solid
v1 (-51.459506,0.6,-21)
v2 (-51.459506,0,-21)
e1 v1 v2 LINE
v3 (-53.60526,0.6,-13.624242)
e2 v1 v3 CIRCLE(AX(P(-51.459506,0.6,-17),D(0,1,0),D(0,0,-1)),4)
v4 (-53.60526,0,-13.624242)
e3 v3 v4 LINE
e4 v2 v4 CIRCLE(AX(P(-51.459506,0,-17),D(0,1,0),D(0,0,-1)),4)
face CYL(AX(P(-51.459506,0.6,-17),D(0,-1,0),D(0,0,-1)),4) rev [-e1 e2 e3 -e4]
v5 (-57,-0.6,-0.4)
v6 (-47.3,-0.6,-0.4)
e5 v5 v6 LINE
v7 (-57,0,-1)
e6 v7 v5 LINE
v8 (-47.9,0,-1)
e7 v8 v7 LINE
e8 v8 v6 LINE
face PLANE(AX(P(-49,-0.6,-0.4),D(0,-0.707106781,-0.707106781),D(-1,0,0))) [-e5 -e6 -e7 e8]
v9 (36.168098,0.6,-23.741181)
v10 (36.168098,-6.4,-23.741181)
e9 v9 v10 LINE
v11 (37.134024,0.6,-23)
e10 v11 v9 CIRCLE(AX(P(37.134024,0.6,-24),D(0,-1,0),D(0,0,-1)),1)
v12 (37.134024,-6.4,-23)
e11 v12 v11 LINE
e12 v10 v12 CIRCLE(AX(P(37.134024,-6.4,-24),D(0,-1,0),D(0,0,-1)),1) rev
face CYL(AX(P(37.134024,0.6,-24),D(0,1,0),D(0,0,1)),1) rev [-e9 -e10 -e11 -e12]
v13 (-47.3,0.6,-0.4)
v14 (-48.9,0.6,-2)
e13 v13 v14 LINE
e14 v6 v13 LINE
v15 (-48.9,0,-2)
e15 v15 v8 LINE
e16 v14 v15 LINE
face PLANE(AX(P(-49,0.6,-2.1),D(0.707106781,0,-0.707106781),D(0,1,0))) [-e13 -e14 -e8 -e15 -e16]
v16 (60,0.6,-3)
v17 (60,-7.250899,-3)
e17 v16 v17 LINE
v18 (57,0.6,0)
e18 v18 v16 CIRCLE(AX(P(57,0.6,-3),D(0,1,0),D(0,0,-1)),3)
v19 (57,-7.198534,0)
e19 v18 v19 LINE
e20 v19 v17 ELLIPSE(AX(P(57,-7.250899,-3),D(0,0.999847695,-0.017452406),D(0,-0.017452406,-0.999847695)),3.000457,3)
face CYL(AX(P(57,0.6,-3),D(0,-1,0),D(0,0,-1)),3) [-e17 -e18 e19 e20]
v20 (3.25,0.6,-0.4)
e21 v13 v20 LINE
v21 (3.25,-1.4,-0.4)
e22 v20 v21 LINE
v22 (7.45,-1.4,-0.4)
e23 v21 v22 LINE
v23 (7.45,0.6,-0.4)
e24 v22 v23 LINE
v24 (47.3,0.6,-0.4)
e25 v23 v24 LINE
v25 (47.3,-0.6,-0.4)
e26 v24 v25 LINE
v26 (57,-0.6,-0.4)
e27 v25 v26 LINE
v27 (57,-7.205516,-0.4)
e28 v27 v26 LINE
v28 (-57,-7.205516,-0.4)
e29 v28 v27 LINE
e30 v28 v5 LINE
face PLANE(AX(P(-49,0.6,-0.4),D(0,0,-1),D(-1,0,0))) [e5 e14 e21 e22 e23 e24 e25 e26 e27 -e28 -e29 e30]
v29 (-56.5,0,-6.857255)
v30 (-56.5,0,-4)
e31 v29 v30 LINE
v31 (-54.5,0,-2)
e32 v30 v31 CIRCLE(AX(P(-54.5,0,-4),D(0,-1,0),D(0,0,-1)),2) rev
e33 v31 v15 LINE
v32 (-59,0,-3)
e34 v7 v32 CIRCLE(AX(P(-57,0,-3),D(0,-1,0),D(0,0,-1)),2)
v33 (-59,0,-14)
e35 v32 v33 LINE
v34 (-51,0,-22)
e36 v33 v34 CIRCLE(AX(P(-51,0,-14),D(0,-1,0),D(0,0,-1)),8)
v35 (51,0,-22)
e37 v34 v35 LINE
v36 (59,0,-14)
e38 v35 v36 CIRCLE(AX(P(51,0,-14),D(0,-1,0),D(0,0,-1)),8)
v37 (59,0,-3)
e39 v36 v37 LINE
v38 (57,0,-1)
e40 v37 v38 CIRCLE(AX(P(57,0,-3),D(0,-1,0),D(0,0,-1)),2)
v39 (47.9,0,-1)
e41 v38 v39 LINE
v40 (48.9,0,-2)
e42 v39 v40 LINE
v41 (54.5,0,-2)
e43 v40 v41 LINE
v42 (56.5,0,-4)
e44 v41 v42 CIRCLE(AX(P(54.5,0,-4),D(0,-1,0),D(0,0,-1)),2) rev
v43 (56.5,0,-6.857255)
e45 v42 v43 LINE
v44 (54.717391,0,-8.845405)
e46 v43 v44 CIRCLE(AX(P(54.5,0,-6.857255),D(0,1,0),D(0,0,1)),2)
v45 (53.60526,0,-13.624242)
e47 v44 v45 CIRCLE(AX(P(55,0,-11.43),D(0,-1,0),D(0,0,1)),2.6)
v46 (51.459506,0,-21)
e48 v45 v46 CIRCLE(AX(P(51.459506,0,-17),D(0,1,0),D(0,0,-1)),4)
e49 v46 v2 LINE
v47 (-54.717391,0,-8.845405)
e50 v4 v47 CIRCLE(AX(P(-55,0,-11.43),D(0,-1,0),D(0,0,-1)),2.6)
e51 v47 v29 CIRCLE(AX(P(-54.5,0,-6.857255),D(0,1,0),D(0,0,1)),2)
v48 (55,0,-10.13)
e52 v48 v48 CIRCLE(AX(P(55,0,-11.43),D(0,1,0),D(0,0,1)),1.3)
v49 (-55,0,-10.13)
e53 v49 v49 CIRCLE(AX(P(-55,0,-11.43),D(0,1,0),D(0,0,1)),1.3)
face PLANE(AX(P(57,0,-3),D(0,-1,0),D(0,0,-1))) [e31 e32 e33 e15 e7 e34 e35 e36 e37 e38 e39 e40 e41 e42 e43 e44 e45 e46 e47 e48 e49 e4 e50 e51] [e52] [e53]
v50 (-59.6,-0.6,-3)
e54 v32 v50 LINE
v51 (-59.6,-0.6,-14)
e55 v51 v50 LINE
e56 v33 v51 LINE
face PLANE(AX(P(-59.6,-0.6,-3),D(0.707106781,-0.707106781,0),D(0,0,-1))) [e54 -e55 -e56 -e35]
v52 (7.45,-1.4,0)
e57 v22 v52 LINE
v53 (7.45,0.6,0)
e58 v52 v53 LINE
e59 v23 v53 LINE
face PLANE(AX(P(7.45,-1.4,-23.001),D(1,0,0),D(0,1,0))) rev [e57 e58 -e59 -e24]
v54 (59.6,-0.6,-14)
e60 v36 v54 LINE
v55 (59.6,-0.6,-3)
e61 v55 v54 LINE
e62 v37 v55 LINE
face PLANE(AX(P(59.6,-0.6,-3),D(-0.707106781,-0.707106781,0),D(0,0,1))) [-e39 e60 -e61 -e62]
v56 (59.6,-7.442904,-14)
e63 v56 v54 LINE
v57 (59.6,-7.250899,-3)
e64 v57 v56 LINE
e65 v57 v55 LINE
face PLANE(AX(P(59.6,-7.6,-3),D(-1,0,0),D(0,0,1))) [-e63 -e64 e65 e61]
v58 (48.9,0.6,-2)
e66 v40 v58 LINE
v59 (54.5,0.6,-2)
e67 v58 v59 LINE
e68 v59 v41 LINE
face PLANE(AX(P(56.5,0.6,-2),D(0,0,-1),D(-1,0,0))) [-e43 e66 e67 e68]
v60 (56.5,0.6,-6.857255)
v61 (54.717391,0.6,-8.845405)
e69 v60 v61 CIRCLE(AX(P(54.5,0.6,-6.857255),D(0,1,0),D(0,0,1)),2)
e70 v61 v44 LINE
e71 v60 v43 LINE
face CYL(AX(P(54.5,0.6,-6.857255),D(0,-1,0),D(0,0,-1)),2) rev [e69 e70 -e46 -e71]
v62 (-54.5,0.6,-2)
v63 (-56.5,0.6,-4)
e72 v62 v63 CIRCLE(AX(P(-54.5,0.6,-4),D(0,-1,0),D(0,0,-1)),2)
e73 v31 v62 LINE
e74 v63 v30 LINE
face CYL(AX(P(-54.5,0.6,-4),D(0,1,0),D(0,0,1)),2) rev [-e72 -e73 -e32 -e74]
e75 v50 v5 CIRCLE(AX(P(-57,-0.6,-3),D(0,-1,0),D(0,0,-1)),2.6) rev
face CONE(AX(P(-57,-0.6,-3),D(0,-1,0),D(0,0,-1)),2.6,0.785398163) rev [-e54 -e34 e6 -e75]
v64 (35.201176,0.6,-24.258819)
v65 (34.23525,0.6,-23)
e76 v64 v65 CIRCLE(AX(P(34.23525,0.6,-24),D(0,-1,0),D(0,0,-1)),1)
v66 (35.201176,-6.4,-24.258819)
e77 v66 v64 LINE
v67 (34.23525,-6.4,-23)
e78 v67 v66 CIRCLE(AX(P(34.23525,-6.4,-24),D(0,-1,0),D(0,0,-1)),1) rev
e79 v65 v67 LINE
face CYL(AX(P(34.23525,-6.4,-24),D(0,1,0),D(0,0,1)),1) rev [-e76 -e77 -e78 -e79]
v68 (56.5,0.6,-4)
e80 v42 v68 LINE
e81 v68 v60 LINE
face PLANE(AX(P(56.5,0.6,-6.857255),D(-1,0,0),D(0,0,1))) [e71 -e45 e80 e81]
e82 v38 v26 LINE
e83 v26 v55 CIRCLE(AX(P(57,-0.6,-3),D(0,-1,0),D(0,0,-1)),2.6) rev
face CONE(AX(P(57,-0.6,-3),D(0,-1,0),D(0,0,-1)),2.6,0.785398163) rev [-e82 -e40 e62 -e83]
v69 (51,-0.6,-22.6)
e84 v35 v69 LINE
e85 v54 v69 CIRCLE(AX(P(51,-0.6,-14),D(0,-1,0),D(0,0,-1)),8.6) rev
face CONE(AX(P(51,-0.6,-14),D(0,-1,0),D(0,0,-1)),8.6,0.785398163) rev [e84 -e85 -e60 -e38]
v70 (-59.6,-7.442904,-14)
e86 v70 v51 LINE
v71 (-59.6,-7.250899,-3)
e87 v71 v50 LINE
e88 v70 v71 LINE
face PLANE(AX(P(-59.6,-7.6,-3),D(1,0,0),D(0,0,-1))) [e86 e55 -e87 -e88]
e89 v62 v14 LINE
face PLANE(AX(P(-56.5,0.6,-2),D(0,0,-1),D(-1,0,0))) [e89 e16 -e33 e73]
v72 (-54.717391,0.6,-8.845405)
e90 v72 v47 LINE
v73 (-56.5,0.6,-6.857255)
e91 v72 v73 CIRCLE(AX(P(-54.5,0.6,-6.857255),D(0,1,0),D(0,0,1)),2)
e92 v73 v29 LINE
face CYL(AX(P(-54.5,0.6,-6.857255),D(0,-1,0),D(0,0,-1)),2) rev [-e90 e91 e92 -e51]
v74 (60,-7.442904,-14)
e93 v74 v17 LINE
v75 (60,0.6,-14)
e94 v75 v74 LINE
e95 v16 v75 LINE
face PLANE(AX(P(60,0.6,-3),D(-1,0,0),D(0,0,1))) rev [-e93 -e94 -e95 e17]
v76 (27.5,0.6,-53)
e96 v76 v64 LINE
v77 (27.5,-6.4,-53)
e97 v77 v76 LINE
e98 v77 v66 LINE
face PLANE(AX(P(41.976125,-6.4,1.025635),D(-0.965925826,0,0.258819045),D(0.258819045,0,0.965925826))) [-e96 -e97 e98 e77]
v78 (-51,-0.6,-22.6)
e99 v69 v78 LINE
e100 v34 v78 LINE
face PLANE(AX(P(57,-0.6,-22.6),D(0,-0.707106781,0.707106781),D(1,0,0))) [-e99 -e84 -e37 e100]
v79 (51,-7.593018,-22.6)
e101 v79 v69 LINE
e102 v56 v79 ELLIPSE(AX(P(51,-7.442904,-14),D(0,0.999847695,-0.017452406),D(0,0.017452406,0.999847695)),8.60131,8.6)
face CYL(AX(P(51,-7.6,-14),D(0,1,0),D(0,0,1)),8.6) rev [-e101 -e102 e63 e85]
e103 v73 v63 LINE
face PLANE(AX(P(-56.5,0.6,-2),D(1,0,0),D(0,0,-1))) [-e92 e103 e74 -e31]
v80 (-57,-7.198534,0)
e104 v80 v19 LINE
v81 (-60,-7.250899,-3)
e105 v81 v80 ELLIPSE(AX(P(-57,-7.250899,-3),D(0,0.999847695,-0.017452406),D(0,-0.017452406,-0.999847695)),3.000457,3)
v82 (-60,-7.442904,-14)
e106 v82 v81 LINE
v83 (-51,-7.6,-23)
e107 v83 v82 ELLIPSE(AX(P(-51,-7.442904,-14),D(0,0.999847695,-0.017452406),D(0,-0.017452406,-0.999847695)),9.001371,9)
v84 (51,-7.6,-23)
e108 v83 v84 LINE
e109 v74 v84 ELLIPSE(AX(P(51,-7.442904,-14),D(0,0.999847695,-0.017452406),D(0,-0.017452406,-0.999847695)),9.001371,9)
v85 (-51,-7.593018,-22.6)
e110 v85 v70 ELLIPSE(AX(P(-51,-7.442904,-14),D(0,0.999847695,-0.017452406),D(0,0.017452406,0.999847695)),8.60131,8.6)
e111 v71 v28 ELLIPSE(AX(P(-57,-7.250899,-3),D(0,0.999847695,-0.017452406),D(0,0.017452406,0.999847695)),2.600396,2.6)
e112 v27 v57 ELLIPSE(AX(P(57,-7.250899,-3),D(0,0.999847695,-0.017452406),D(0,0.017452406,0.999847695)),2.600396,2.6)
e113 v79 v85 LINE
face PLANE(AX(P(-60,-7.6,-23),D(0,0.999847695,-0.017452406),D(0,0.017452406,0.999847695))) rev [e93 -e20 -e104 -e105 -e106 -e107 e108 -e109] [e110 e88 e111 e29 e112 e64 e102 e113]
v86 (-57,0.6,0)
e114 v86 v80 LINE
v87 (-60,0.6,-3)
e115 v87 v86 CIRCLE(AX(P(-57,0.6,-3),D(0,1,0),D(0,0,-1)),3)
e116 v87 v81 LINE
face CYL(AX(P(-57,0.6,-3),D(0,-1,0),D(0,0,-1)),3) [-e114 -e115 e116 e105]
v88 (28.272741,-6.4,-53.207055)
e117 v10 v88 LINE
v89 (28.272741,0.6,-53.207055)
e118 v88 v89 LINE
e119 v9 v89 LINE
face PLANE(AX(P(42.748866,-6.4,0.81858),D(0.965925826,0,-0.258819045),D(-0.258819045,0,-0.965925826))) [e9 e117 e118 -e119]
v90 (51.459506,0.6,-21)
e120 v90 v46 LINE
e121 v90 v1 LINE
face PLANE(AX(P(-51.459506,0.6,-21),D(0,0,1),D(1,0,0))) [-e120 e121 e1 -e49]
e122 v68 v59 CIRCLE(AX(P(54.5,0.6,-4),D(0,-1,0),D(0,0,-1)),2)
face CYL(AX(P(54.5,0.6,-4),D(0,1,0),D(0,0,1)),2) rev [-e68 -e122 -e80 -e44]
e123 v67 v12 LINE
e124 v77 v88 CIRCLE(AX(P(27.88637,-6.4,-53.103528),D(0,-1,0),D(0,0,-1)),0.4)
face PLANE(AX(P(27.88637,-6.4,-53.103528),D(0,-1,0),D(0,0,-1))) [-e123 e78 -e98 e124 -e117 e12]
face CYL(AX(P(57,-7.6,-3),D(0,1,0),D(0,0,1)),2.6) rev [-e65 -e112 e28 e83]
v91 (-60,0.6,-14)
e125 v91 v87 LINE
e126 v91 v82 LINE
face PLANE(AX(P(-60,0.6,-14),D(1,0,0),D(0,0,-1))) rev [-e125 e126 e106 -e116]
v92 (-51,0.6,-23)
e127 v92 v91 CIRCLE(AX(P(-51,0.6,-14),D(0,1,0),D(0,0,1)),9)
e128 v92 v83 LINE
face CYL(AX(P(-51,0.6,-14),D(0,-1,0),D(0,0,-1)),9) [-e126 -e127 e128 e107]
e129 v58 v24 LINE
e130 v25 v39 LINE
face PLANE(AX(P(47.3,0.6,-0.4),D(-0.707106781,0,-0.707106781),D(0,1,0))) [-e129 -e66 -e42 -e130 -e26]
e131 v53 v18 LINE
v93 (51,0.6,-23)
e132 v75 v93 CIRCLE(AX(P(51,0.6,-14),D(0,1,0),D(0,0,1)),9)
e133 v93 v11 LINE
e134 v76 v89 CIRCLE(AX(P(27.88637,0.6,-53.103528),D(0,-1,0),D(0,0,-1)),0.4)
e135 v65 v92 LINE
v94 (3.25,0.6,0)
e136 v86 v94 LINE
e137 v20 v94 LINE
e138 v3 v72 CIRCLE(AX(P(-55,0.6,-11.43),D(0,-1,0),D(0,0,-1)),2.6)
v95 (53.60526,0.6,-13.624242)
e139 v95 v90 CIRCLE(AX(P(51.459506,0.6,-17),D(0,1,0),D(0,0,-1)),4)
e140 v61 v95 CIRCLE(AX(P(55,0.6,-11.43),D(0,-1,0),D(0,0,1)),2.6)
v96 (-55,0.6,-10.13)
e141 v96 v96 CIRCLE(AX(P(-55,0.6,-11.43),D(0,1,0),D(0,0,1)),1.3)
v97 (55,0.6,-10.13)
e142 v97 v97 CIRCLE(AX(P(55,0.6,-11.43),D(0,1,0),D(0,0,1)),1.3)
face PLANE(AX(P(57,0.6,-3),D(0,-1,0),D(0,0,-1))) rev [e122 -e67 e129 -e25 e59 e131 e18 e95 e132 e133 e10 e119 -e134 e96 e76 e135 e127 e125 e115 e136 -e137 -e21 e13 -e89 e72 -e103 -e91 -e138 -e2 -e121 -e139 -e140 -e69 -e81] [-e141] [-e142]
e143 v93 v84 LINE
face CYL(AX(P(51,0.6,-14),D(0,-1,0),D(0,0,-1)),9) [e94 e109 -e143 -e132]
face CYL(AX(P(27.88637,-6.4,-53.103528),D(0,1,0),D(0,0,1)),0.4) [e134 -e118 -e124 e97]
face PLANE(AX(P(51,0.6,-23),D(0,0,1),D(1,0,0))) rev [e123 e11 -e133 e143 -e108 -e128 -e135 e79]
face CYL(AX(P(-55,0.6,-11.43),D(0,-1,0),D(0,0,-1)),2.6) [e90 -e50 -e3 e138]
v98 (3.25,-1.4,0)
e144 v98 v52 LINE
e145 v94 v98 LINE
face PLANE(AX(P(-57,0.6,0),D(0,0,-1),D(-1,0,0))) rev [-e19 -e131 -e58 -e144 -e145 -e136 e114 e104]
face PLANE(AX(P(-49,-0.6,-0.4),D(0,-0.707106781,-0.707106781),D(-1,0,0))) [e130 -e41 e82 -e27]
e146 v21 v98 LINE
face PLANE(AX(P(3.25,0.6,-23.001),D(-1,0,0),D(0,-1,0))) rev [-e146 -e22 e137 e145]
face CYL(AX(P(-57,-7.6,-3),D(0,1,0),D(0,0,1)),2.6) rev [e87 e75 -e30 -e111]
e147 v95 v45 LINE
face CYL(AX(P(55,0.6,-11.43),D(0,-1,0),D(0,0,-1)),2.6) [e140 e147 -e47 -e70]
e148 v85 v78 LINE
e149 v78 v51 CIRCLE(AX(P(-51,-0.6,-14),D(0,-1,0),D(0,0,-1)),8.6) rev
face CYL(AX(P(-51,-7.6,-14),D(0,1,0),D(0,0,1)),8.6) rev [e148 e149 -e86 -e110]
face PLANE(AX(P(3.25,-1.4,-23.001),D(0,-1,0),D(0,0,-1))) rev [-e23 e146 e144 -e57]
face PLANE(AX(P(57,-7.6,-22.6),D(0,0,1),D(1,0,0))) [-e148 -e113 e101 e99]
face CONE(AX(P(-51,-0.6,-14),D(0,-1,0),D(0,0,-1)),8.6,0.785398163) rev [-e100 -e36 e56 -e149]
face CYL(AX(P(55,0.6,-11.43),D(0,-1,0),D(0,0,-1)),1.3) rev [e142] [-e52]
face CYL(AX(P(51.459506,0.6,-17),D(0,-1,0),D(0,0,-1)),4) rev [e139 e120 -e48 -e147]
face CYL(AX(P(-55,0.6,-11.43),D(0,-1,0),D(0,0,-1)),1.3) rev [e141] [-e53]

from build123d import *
from build123d.topology import SkipClean

# Parameters (mm, degrees)
SKETCH1_R               = 1.3
BOSS_EXTRUDE1_DEPTH     = 0.6
BOSS_EXTRUDE2_START     = 7.6
BOSS_EXTRUDE2_DEPTH     = 8.2
CHAMFER1_SIZE           = 0.6
CUT_EXTRUDE1_DEPTH      = 65.705177536
CUT_EXTRUDE1_DEPTH_BACK = 65.705177536
CUT_EXTRUDE2_REACH      = 66.705
SKETCH11_W              = 4.2
SKETCH11_H              = 2
FILLET1_R               = 2
CHAMFER2_SIZE           = 1.7
BOSS_EXTRUDE3_START     = 0.6
BOSS_EXTRUDE3_DEPTH     = 7
FILLET2_R               = 1


with BuildPart() as part:
    # Sketch1 → Boss-Extrude1 (new body)
    with BuildSketch(Plane(origin=(0, 0, 0), x_dir=(1, 0, 0), z_dir=(0, 1, 0))):
        with BuildLine():
            Line((-57, 0), (-56.5, 0))
            Line((-56.5, 0), (56.5, 0))
            Line((56.5, 0), (57, 0))
            ThreePointArc((57, 0), (59.121320344, 0.878679656), (60, 3))
            Line((60, 3), (60, 14))
            ThreePointArc((60, 14), (57.363961031, 20.363961031), (51, 23))
            Line((51, 23), (-51, 23))
            ThreePointArc((-51, 23), (-57.363961031, 20.363961031), (-60, 14))
            Line((-60, 14), (-60, 3))
            ThreePointArc((-60, 3), (-59.121320344, 0.878679656), (-57, 0))
        make_face()
        with Locations(Location((55, 11.43, 0), (0, 0, 270))):
            Circle(SKETCH1_R, mode=Mode.SUBTRACT)
        with Locations(Location((-55, 11.43, 0), (0, 0, 270))):
            Circle(SKETCH1_R, mode=Mode.SUBTRACT)
        with BuildLine():
            Line((-51.459505684, 21), (51.459505684, 21))
            ThreePointArc((51.459505684, 21), (55.300275809, 18.117356187), (53.605259815, 13.624242424))
            ThreePointArc((53.605259815, 13.624242424), (52.467669637, 10.840675867), (54.717391304, 8.845404804))
            ThreePointArc((54.717391304, 8.845404804), (55.989090764, 8.192398352), (56.5, 6.857254654))
            Line((56.5, 6.857254654), (56.5, 2))
            Line((56.5, 2), (49, 2))
            Line((49, 2), (49, 0.4))
            Line((49, 0.4), (-49, 0.4))
            Line((-49, 0.4), (-49, 2))
            Line((-49, 2), (-56.5, 2))
            Line((-56.5, 2), (-56.5, 6.857254654))
            ThreePointArc((-56.5, 6.857254654), (-55.989090764, 8.192398352), (-54.717391304, 8.845404804))
            ThreePointArc((-54.717391304, 8.845404804), (-52.467669637, 10.840675867), (-53.605259815, 13.624242424))
            ThreePointArc((-53.605259815, 13.624242424), (-55.300275809, 18.117356187), (-51.459505684, 21))
        make_face(mode=Mode.SUBTRACT)
    extrude(amount=BOSS_EXTRUDE1_DEPTH)

    # Sketch8 → Boss-Extrude2 (add)
    with SkipClean():  # the faces are left unmerged after this step: merging them gives an invalid solid
        with BuildSketch(Plane(origin=(0, 0, 0), x_dir=(-1, 0, 0), z_dir=(0, -1, 0)).offset(BOSS_EXTRUDE2_START)):
            with BuildLine():
                Line((-57, 0), (57, 0))
                ThreePointArc((57, 0), (59.121320344, 0.878679656), (60, 3))
                Line((60, 3), (60, 14))
                ThreePointArc((60, 14), (57.363961031, 20.363961031), (51, 23))
                Line((51, 23), (-51, 23))
                ThreePointArc((-51, 23), (-57.363961031, 20.363961031), (-60, 14))
                Line((-60, 14), (-60, 3))
                ThreePointArc((-60, 3), (-59.121320344, 0.878679656), (-57, 0))
            make_face()
            with BuildLine():
                Line((51, 22.6), (-51, 22.6))
                ThreePointArc((-51, 22.6), (-57.081118318, 20.081118318), (-59.6, 14))
                Line((-59.6, 14), (-59.6, 3))
                ThreePointArc((-59.6, 3), (-58.838477631, 1.161522369), (-57, 0.4))
                Line((-57, 0.4), (57, 0.4))
                ThreePointArc((57, 0.4), (58.838477631, 1.161522369), (59.6, 3))
                Line((59.6, 3), (59.6, 14))
                ThreePointArc((59.6, 14), (57.081118318, 20.081118318), (51, 22.6))
            make_face(mode=Mode.SUBTRACT)
        extrude(amount=-BOSS_EXTRUDE2_DEPTH)
    add(part.part.scale(1), mode=Mode.REPLACE)  # the faces are merged on a copy

    # Chamfer1
    chamfer1_edges = [part.edges().sort_by_distance(p)[0] for p in [
        (-53, 0, -0.4),
        (53, 0, -0.4),
        (-58.838477631, 0, -1.161522369),
        (-59.6, 0, -8.5),
        (-57.081118318, 0, -20.081118318),
        (0, 0, -22.6),
        (57.081118318, 0, -20.081118318),
        (59.6, 0, -8.5),
        (58.838477631, 0, -1.161522369),
    ]]
    chamfer(chamfer1_edges, length=CHAMFER1_SIZE)

    # Sketch9 → Cut-Extrude1 (cut, two sides: drawn at the far end of the back side and taken through both)
    with BuildSketch(Plane(origin=(0, 0, 0), x_dir=(0, 0, -1), z_dir=(1, 0, 0)).offset(-CUT_EXTRUDE1_DEPTH_BACK)):
        Polygon((-2, -7.6), (23, -7.6), (-2, -7.163623377), align=None)
    extrude(amount=CUT_EXTRUDE1_DEPTH + CUT_EXTRUDE1_DEPTH_BACK, mode=Mode.SUBTRACT)

    # Sketch11 → Cut-Extrude2 (cut, up to next)
    with BuildSketch(Plane.XY, mode=Mode.PRIVATE) as cut_extrude2_sk1:
        with Locations((5.35, -0.4)):
            Rectangle(SKETCH11_W, SKETCH11_H)
    cut_extrude2_tool1 = extrude(cut_extrude2_sk1.sketch, amount=-CUT_EXTRUDE2_REACH, mode=Mode.PRIVATE) & part.part
    add(cut_extrude2_tool1.solids().sort_by_distance((5.35, -0.4, 0))[0], mode=Mode.SUBTRACT)

    # Fillet1
    fillet1_edges = [part.edges().sort_by_distance(p)[0] for p in [
        (-56.5, 0.3, -2),
        (56.5, 0.3, -2),
    ]]
    fillet(fillet1_edges, radius=FILLET1_R)

    # Chamfer2
    # the kernel refuses this chamfer: 1.7 mm, written as the material it adds along each edge
    with BuildSketch(Plane(origin=(-49, -4.97186108, -0.4), x_dir=(-0.02749587661058786, 0, -0.9996219169112968), z_dir=(0, 1, 0))) as chamfer2_piece_1_section:
        Polygon((CHAMFER2_SIZE * 0.999621916911, -CHAMFER2_SIZE * 0.0274958766106), (-CHAMFER2_SIZE * 0.0274958766106, -CHAMFER2_SIZE * 0.999621916911), (0, 0), align=None)
    chamfer2_piece_1 = extrude(amount=5.57186108, mode=Mode.PRIVATE)
    chamfer2_piece_1 = split(chamfer2_piece_1, bisect_by=Plane(origin=(-48.243333333, -0.31, -0.69), z_dir=(0, 0.7071067811865475, 0.7071067811865476)), keep=Keep.TOP, mode=Mode.PRIVATE)
    add(chamfer2_piece_1)
    with BuildSketch(Plane(origin=(-49, -4.97186108, -0.4), x_dir=(-0.02749587661058786, 0, -0.9996219169112968), z_dir=(0, 1, 0))) as chamfer2_piece_2_section:
        Polygon((CHAMFER2_SIZE * 0.999621916911, -CHAMFER2_SIZE * 0.0274958766106), (-CHAMFER2_SIZE * 0.0274958766106, -CHAMFER2_SIZE * 0.999621916911), (0, 0), align=None)
    chamfer2_piece_2 = extrude(amount=5.57186108, mode=Mode.PRIVATE)
    chamfer2_piece_2 = split(chamfer2_piece_2, bisect_by=Plane(origin=(-48.705555556, 0, -1.511111111), z_dir=(0, 1, 0)), keep=Keep.TOP, mode=Mode.PRIVATE)
    chamfer2_piece_2 = split(chamfer2_piece_2, bisect_by=Plane(origin=(-48.705555556, 0.227272727, -2), z_dir=(0, 0, 1)), keep=Keep.TOP, mode=Mode.PRIVATE)
    add(chamfer2_piece_2)
    with BuildSketch(Plane(origin=(49, 0.6, -0.4), x_dir=(0.02749587661058786, 0, -0.9996219169112968), z_dir=(0, -1, 0))) as chamfer2_piece_3_section:
        Polygon((CHAMFER2_SIZE * 0.999621916911, -CHAMFER2_SIZE * 0.0274958766106), (-CHAMFER2_SIZE * 0.0274958766106, -CHAMFER2_SIZE * 0.999621916911), (0, 0), align=None)
    chamfer2_piece_3 = extrude(amount=5.57186108, mode=Mode.PRIVATE)
    chamfer2_piece_3 = split(chamfer2_piece_3, bisect_by=Plane(origin=(48.35, 0.060810811, -1.060810811), z_dir=(0, 0.7071067811865475, 0.7071067811865476)), keep=Keep.TOP, mode=Mode.PRIVATE)
    add(chamfer2_piece_3)
    with BuildSketch(Plane(origin=(49, 0.6, -0.4), x_dir=(0.02749587661058786, 0, -0.9996219169112968), z_dir=(0, -1, 0))) as chamfer2_piece_4_section:
        Polygon((CHAMFER2_SIZE * 0.999621916911, -CHAMFER2_SIZE * 0.0274958766106), (-CHAMFER2_SIZE * 0.0274958766106, -CHAMFER2_SIZE * 0.999621916911), (0, 0), align=None)
    chamfer2_piece_4 = extrude(amount=5.57186108, mode=Mode.PRIVATE)
    chamfer2_piece_4 = split(chamfer2_piece_4, bisect_by=Plane(origin=(48.705555556, 0, -1.511111111), z_dir=(0, 1, 0)), keep=Keep.TOP, mode=Mode.PRIVATE)
    chamfer2_piece_4 = split(chamfer2_piece_4, bisect_by=Plane(origin=(48.705555556, 0.227272727, -2), z_dir=(0, 0, 1)), keep=Keep.TOP, mode=Mode.PRIVATE)
    add(chamfer2_piece_4)

    # Sketch12 → Boss-Extrude3 (add)
    with BuildSketch(Plane(origin=(0, 0, 0), x_dir=(1, 0, 0), z_dir=(0, 1, 0)).offset(BOSS_EXTRUDE3_START)):
        with BuildLine():
            Line((28.272740661, 53.207055236), (36.366696717, 23))
            Line((36.366696717, 23), (35.538475773, 23))
            Line((35.538475773, 23), (27.5, 53))
            ThreePointArc((27.5, 53), (27.782842712, 53.489897949), (28.272740661, 53.207055236))
        make_face()
    extrude(amount=-BOSS_EXTRUDE3_DEPTH)

    # Fillet2
    fillet2_edges = [part.edges().sort_by_distance(p)[0] for p in [
        (36.366696717, -2.9, -23),
        (35.538475773, -2.9, -23),
    ]]
    fillet(fillet2_edges, radius=FILLET2_R)


solid = part.part
